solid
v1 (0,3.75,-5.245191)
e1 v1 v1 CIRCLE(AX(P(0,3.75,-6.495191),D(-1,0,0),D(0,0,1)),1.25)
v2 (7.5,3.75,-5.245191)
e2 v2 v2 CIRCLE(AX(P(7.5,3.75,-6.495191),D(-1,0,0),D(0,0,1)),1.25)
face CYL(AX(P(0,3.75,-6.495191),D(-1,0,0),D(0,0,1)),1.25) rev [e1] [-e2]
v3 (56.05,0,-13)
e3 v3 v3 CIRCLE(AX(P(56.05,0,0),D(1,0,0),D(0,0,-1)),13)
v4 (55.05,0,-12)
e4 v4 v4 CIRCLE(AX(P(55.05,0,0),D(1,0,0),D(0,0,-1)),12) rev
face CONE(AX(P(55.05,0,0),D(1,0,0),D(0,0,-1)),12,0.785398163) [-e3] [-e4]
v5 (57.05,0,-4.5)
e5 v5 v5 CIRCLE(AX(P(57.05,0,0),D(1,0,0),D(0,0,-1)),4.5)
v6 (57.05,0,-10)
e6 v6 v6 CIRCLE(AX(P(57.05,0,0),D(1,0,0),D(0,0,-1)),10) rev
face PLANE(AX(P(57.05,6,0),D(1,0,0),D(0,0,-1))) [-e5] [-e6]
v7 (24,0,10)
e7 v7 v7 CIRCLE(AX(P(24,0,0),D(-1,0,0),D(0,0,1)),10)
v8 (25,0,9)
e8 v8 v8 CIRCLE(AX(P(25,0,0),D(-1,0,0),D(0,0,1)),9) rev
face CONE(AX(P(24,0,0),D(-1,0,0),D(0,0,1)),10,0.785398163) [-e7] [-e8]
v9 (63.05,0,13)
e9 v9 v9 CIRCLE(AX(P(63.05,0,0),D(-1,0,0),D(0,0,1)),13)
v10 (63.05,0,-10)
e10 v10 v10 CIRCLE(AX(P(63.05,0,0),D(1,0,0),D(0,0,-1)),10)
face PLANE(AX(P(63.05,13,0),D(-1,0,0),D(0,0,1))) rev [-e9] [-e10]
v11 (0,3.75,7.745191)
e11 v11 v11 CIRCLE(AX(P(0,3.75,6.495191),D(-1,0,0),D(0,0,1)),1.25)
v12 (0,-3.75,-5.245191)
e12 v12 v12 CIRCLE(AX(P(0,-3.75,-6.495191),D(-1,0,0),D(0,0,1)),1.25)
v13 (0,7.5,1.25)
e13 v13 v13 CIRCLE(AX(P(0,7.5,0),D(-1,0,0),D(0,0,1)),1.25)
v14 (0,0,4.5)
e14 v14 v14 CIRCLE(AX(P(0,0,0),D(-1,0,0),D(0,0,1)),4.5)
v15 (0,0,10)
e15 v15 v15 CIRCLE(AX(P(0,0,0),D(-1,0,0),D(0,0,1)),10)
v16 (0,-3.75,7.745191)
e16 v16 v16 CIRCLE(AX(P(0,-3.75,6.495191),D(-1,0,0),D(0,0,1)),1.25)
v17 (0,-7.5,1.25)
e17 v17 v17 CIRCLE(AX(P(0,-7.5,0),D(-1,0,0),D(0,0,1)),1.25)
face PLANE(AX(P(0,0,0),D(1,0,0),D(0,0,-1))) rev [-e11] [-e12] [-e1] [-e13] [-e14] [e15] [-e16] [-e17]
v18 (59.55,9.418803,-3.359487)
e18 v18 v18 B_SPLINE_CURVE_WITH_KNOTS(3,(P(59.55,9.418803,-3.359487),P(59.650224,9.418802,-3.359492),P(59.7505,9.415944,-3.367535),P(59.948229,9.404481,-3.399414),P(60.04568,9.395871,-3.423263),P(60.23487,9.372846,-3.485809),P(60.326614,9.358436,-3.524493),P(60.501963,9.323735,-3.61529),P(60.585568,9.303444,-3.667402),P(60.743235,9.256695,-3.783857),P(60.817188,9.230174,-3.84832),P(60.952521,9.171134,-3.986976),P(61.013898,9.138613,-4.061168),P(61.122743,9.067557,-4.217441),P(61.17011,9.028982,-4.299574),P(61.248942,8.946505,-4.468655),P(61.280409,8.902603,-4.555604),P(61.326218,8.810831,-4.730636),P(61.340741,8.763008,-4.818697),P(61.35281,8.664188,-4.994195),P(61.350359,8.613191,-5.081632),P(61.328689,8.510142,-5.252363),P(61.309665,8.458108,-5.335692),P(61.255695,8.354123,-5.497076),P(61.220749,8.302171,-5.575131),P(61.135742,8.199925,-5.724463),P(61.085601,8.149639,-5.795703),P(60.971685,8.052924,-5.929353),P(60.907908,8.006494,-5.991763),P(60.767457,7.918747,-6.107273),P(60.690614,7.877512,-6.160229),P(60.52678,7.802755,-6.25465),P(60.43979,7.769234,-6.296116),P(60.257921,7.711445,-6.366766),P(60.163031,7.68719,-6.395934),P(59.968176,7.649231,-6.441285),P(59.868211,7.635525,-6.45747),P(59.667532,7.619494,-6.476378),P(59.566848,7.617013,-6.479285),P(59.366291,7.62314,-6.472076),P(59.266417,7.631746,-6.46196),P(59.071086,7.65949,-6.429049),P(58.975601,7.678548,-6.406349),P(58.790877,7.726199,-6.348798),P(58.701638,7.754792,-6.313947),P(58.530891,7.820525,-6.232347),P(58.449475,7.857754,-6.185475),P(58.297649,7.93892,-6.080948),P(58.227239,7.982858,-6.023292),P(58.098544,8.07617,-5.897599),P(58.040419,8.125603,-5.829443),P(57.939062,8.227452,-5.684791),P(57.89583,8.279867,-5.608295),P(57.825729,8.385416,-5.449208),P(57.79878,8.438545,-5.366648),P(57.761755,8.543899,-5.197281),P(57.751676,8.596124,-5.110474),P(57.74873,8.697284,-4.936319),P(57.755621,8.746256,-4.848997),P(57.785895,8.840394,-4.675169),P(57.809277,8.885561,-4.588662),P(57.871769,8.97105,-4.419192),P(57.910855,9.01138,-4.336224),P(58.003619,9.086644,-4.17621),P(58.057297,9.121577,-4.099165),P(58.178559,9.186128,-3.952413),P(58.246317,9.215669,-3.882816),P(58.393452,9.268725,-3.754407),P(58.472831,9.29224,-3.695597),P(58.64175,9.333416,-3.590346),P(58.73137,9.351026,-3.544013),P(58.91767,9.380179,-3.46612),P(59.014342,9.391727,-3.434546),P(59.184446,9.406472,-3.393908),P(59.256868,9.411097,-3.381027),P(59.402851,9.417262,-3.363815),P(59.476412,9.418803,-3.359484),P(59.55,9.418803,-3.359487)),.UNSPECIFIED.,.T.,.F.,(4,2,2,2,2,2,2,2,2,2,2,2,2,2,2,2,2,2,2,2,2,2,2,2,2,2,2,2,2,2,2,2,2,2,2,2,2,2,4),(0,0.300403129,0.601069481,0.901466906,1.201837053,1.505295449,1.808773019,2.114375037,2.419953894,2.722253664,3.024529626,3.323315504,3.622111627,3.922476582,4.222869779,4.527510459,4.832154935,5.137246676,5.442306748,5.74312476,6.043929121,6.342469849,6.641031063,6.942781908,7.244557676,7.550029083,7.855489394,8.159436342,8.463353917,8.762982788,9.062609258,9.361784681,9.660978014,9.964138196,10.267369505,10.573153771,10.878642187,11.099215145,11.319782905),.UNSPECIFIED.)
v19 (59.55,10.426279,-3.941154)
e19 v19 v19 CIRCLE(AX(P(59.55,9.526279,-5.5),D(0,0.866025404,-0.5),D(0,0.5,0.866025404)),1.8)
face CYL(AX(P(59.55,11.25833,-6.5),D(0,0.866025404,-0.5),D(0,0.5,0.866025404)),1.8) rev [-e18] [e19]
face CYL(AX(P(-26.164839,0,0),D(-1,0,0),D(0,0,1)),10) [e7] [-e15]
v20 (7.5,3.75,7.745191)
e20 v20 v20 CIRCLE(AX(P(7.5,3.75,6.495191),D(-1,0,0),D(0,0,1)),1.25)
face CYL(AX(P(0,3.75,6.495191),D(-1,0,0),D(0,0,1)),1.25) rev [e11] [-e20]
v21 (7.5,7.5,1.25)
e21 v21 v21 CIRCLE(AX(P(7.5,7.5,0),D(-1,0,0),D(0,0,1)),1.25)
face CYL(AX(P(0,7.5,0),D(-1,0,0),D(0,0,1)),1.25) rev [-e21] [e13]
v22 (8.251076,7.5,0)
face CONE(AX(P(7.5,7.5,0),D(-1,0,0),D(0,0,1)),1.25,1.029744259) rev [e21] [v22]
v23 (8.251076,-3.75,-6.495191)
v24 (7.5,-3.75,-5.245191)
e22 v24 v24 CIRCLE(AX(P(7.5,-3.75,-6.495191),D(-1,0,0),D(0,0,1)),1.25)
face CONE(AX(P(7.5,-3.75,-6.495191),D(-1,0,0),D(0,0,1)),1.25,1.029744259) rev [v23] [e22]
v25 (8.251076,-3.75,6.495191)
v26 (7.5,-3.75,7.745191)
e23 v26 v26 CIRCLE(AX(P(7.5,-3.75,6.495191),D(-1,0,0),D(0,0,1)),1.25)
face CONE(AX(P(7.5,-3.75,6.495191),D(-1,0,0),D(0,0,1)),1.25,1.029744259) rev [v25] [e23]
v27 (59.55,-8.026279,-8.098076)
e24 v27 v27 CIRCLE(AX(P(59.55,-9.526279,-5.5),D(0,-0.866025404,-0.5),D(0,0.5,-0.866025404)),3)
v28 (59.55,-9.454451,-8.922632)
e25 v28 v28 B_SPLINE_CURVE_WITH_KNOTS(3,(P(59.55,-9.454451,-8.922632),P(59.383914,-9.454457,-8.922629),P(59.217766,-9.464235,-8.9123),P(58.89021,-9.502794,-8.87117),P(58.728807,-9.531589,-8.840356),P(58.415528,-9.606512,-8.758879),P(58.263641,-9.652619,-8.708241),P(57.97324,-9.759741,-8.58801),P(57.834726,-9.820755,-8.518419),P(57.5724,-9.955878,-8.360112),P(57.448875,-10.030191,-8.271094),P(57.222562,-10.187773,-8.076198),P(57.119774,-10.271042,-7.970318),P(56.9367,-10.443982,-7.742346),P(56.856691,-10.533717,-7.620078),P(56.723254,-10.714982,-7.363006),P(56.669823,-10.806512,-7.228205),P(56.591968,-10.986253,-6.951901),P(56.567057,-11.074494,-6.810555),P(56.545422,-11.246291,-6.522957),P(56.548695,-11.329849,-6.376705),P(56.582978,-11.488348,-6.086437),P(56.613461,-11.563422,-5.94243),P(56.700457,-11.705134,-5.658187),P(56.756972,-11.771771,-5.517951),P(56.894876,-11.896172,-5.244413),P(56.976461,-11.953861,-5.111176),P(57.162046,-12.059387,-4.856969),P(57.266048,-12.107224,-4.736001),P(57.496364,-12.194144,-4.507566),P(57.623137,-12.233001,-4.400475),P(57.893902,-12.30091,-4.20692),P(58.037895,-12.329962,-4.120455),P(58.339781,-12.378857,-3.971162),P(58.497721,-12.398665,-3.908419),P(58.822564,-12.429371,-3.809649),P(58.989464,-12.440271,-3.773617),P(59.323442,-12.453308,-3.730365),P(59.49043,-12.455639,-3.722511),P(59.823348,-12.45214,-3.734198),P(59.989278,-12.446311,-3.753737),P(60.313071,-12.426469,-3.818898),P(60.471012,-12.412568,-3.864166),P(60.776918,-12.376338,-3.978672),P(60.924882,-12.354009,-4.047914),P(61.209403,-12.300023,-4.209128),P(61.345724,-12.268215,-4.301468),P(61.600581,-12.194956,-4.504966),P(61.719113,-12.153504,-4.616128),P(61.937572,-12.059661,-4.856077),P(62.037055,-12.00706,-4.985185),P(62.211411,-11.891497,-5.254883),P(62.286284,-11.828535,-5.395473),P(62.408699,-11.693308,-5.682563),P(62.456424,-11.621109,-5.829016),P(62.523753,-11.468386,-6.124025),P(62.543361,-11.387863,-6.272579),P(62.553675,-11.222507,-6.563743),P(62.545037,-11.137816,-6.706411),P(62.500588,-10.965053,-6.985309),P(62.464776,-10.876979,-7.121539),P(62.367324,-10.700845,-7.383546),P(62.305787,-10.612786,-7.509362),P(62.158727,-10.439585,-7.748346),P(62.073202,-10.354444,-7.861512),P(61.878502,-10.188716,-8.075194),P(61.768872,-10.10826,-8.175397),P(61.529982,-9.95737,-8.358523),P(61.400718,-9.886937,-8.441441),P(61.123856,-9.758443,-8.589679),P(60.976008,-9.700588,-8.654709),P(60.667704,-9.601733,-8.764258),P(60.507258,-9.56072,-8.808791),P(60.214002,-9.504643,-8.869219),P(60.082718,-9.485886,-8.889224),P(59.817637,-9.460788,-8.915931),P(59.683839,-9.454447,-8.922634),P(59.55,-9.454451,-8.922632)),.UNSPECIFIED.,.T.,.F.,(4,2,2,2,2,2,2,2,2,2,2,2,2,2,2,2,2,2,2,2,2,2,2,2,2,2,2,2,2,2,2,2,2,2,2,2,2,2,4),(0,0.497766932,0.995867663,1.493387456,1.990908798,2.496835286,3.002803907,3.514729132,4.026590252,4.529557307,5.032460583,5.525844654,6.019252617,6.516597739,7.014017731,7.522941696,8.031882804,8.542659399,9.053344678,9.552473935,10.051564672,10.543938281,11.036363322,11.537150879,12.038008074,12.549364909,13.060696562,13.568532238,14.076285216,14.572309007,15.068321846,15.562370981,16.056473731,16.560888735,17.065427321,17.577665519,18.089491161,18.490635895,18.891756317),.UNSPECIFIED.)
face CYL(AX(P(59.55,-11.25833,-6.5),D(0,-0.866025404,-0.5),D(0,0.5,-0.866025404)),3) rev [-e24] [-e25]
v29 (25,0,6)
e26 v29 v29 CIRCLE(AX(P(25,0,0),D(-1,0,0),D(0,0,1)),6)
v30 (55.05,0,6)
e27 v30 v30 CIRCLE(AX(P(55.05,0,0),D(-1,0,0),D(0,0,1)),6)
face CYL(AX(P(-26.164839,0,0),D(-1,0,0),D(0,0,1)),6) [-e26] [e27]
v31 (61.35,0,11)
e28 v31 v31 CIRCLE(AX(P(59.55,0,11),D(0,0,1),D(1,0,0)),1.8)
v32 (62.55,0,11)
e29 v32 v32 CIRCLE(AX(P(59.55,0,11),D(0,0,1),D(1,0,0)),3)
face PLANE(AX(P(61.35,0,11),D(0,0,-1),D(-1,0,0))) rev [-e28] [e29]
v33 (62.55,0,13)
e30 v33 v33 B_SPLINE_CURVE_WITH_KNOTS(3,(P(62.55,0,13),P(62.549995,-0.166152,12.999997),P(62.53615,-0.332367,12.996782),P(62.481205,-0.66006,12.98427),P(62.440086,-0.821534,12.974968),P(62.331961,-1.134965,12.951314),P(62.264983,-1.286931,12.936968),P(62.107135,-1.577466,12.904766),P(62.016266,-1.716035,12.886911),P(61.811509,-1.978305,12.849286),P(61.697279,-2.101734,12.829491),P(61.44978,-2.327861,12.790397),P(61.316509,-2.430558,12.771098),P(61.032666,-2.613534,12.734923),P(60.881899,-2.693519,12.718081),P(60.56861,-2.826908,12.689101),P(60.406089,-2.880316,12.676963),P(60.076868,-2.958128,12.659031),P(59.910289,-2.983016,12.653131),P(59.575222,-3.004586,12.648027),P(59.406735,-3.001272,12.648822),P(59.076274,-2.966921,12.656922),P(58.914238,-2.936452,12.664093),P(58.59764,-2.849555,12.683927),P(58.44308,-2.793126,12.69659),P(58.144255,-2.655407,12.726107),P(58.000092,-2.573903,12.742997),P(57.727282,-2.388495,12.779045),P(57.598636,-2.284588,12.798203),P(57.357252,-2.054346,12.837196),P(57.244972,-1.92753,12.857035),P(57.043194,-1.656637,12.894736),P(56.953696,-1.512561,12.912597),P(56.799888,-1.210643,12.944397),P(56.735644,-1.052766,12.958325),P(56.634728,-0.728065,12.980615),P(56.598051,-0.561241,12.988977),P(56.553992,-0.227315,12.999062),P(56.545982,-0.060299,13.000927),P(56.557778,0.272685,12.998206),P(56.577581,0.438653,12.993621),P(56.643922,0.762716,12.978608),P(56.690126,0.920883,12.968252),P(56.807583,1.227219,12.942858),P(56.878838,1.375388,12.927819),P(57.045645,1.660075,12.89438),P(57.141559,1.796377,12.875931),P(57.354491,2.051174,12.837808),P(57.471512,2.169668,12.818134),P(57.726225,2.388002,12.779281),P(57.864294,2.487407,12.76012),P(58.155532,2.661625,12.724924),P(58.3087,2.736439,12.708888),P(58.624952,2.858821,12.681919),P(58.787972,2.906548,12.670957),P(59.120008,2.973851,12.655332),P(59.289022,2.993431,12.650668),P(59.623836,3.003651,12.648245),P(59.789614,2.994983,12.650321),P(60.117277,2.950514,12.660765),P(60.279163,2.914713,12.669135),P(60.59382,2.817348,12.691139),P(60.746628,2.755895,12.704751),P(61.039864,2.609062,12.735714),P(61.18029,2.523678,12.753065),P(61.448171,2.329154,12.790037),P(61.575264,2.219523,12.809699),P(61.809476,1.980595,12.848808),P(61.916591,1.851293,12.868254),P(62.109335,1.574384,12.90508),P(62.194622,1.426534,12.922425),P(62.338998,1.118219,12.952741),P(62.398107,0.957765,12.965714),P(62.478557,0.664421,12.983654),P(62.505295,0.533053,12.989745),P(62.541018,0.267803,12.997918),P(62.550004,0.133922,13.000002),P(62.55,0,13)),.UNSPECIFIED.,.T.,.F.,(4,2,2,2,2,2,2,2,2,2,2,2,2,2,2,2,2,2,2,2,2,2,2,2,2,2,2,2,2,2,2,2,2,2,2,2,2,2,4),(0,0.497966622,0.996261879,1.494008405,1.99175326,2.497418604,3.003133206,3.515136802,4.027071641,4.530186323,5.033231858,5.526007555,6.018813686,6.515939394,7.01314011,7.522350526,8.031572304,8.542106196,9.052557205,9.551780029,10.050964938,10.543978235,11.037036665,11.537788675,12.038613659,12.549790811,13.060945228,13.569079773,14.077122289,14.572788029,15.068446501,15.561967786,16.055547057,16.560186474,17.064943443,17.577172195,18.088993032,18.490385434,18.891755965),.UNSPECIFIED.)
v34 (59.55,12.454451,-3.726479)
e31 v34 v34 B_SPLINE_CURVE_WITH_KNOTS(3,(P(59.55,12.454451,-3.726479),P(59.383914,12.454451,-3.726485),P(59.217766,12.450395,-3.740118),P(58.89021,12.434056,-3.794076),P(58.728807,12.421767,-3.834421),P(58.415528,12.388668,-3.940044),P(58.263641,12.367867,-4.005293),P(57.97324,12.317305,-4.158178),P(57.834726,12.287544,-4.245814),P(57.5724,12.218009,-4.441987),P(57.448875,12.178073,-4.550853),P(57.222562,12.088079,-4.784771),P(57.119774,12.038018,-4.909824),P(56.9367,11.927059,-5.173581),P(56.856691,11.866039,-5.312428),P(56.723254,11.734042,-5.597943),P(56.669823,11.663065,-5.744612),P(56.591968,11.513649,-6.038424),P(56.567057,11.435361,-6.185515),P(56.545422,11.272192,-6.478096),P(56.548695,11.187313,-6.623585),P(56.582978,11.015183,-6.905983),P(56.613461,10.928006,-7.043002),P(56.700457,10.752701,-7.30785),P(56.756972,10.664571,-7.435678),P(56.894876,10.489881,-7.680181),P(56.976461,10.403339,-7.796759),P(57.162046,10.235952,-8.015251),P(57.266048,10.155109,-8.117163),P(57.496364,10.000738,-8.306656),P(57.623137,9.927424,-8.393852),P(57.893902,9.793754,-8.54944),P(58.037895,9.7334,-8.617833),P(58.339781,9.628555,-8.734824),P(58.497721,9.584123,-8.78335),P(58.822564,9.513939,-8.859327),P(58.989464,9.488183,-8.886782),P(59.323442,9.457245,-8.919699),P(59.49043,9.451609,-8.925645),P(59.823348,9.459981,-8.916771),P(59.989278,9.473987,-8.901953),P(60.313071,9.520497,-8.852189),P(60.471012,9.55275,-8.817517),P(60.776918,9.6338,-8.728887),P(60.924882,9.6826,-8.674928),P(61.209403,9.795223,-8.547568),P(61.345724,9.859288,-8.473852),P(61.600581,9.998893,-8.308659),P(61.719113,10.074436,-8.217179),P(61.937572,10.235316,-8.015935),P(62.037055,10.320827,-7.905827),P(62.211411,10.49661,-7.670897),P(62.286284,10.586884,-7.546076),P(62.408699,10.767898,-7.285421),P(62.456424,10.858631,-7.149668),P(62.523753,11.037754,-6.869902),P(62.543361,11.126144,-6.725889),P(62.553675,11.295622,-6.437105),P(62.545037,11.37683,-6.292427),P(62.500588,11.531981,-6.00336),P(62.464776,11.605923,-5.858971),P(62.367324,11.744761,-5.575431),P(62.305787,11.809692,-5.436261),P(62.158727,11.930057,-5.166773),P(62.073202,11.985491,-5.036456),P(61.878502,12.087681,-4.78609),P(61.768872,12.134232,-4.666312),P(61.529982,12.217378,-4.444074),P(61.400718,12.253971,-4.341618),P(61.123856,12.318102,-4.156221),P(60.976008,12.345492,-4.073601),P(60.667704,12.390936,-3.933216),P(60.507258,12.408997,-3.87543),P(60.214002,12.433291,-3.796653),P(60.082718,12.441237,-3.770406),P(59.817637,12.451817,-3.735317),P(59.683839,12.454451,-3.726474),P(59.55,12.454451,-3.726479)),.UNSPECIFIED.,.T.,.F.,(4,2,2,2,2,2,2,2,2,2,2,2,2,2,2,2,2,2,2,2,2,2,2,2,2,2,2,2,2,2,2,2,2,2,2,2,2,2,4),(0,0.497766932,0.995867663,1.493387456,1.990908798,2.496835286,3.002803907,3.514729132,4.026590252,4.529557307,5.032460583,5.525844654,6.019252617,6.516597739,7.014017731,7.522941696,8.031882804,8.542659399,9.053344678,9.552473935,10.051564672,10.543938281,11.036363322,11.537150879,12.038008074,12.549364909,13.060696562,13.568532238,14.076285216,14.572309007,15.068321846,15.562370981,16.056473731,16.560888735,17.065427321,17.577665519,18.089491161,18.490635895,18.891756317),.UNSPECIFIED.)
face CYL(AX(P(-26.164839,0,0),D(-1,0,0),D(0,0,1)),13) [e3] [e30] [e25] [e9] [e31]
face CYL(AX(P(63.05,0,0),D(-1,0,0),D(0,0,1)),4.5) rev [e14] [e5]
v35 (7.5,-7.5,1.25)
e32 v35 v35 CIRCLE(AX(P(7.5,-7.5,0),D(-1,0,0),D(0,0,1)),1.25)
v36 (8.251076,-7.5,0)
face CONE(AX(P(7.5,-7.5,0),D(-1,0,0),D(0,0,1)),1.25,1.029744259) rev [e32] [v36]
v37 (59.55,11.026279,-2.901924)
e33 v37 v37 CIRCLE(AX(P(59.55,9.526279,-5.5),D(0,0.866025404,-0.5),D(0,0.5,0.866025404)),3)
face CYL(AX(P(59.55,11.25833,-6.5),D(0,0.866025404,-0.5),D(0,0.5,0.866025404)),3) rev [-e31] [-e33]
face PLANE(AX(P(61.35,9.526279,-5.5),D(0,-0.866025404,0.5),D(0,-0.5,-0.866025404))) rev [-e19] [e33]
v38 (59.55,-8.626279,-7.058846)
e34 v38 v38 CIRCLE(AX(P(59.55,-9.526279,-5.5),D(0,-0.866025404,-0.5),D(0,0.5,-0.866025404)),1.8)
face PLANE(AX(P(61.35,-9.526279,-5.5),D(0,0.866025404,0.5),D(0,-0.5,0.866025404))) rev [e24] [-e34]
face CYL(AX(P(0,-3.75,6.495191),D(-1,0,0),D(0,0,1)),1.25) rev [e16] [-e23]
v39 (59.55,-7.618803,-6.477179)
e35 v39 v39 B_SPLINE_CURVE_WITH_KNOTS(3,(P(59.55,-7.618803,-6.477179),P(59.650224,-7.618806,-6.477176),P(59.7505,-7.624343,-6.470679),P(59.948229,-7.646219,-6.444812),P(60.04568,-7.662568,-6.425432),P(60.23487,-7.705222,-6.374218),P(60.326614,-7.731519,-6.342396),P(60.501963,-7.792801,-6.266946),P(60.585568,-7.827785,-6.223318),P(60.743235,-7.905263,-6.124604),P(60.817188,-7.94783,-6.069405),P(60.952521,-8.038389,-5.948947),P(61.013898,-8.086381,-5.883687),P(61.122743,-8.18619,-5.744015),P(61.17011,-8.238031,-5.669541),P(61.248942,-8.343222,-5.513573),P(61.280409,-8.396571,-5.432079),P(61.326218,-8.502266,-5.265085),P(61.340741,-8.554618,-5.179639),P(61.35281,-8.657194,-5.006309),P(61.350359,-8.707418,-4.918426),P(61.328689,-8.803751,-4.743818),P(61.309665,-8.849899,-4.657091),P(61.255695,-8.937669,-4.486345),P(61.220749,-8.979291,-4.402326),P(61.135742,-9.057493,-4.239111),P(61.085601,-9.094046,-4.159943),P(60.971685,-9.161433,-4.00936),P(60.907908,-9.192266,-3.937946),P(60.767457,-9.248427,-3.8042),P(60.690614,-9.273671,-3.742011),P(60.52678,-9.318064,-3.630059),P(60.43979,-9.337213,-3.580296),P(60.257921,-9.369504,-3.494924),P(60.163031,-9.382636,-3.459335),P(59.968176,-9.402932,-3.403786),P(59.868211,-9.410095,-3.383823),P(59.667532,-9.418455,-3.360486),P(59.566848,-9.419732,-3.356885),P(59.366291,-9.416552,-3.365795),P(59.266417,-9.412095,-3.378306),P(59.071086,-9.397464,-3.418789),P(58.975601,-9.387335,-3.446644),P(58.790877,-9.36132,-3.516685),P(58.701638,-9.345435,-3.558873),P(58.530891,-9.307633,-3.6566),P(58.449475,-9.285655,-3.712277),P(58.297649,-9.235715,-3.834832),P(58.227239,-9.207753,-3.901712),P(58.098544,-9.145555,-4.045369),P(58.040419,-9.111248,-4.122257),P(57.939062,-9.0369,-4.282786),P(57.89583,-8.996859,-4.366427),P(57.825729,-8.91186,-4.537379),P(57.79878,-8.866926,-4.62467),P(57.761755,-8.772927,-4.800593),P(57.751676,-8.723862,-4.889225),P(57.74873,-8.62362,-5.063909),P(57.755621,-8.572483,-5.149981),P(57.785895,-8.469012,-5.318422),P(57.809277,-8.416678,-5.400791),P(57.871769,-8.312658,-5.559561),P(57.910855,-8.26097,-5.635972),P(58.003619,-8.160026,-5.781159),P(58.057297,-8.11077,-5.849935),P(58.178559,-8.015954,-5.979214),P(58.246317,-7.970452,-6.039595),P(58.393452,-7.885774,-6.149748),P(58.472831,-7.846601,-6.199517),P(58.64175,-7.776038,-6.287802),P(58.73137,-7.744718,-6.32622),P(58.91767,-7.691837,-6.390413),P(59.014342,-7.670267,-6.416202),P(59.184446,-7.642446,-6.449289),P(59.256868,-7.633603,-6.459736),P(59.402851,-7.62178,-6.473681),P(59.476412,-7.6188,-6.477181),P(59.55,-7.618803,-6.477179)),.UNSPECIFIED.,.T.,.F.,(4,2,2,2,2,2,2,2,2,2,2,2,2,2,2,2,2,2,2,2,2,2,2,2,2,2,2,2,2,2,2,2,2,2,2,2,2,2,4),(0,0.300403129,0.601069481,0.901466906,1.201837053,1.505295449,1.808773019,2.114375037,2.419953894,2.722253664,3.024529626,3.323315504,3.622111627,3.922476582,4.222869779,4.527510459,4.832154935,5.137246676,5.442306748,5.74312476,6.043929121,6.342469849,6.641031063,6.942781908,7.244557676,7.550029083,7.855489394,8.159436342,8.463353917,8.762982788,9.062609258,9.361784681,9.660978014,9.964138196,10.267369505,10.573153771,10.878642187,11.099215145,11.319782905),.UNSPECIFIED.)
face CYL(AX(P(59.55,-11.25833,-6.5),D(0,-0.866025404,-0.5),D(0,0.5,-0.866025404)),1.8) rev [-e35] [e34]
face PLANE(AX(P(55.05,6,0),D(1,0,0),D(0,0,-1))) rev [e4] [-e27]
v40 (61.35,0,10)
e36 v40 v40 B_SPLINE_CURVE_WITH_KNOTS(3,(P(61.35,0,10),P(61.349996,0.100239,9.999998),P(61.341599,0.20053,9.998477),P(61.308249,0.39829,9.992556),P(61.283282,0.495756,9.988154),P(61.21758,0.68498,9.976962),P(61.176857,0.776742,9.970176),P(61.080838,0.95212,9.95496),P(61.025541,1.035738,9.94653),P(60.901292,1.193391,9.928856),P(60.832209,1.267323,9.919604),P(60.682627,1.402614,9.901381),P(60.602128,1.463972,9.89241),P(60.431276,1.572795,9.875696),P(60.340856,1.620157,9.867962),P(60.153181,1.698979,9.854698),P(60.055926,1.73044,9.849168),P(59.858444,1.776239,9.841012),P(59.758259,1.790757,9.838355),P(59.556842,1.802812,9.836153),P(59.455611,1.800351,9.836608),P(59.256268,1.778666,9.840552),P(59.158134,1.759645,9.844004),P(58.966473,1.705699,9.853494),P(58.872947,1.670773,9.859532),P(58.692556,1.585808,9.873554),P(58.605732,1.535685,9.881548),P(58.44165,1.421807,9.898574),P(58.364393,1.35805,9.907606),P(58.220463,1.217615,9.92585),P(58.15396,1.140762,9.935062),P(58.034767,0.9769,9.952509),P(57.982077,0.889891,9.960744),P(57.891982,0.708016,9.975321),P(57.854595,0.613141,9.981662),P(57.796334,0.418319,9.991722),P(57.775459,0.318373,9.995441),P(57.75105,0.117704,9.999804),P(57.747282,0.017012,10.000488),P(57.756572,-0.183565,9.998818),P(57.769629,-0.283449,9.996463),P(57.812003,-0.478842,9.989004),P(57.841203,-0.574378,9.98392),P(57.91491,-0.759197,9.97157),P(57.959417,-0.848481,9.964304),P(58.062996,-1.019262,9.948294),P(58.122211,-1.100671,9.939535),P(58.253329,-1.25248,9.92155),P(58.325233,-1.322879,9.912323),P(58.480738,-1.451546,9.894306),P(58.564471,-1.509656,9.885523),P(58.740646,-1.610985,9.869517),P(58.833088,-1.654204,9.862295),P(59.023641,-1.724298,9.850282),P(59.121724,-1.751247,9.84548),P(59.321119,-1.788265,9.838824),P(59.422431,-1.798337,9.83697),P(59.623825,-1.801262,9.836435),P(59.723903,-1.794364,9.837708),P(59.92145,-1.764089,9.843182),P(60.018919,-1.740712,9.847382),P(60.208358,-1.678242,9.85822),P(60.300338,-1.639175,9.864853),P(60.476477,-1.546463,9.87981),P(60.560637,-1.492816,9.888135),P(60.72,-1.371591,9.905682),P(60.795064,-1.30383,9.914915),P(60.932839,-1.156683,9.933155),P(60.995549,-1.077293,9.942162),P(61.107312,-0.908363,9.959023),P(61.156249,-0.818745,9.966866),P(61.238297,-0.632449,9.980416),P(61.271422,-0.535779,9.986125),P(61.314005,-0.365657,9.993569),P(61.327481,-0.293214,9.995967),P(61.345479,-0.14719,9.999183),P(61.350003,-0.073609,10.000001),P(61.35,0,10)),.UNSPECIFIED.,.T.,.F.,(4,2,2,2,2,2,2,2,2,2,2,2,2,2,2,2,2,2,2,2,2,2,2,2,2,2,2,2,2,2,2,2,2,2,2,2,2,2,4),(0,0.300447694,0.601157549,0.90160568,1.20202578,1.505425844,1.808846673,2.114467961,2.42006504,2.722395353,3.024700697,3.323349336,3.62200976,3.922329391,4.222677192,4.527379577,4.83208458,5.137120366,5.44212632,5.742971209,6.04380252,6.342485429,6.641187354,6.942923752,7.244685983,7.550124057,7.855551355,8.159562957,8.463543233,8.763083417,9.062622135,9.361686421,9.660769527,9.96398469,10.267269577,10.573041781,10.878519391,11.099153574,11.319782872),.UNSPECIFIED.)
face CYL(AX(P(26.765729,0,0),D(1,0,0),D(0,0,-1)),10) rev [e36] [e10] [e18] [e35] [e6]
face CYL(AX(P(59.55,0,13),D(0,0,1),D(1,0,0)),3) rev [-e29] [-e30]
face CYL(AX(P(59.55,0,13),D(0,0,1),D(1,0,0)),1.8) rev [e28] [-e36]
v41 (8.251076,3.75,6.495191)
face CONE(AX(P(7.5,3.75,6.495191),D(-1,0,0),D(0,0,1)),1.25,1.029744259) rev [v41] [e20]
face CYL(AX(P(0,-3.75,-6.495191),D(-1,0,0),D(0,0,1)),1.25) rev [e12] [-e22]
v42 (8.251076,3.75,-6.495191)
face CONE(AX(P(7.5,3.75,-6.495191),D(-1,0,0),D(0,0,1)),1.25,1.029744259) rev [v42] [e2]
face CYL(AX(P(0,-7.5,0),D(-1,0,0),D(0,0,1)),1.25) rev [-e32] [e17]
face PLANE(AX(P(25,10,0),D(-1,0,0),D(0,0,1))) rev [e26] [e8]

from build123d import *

# Parameters (mm, degrees)
SKETCH_2_R                = 10
CUT_EXTRUDE_1_DEPTH       = 6
SKETCH_3_R                = 4.5
CUT_EXTRUDE_2_DEPTH       = 66.675737529
HOLE_START                = 11
HOLE_WIZARD_1_OUTLINE_R   = 3
HOLE_WIZARD_1_DEPTH       = 2.000000102
HOLE_START_2              = 9.836666254
HOLE_WIZARD_1_2_OUTLINE_R = 1.8
HOLE_WIZARD_1_2_DEPTH     = 1.163333746
PATTERN_CIRCULAR_1_COUNT  = 3
PATTERN_CIRCULAR_2_COUNT  = 6
CHAMFER_1_SIZE            = 1


# Read off the part's stored shape, not the designer's step: 打孔尺寸(%根据)内六角圆柱头螺钉的类型1
with BuildPart() as part:
    # 草图1 → 旋转1 (revolve)
    with BuildSketch(Plane.XY, mode=Mode.PRIVATE) as revolve_1_sk:
        Polygon((0, 0), (0, 10), (25, 10), (25, 6), (55.05, 6), (55.05, 13), (63.05, 13), (63.05, 0), align=None)
    revolve(revolve_1_sk.sketch.rotate(Axis((-26.16483903, 0, 0), (1, 0, 0)), 90), axis=Axis((-26.16483903, 0, 0), (1, 0, 0)))

    # 草图2 → 切除-拉伸1 (cut)
    with BuildSketch(Plane(origin=(63.05, 0, 0), x_dir=(0, 0, -1), z_dir=(1, 0, 0))):
        with Locations(Location((0, 0, 0), (0, 0, 180))):
            Circle(SKETCH_2_R)
    extrude(amount=-CUT_EXTRUDE_1_DEPTH, mode=Mode.SUBTRACT)

    # 草图3 → 切除-拉伸2 (cut, through all)
    with BuildSketch(Plane.ZY):
        Circle(SKETCH_3_R)
    extrude(amount=-CUT_EXTRUDE_2_DEPTH, mode=Mode.SUBTRACT)

    # 打孔尺寸(%根据)内六角圆柱头螺钉的类型1 outline → 打孔尺寸(%根据)内六角圆柱头螺钉的类型1 (cut)
    with BuildSketch(Plane.XY.offset(HOLE_START)):
        with Locations((59.55, 0)):
            Circle(HOLE_WIZARD_1_OUTLINE_R)
    hole_wizard_1 = extrude(amount=HOLE_WIZARD_1_DEPTH, mode=Mode.SUBTRACT)

    # Hole Wizard 1 2 outline → Hole Wizard 1 2 (cut)
    with BuildSketch(Plane.XY.offset(HOLE_START_2)):
        with Locations((59.55, 0)):
            Circle(HOLE_WIZARD_1_2_OUTLINE_R)
    hole_wizard_1_2 = extrude(amount=HOLE_WIZARD_1_2_DEPTH, mode=Mode.SUBTRACT)

    # 阵列(圆周)1: 打孔尺寸(%根据)内六角圆柱头螺钉的类型1, Hole Wizard 1 2 ×3 about axis
    pattern_circular_1_axis = Axis((0, 0, 0), (1, 0, 0))
    add([hole_wizard_1.rotate(pattern_circular_1_axis, i * 360 / PATTERN_CIRCULAR_1_COUNT) for i in range(1, PATTERN_CIRCULAR_1_COUNT)], mode=Mode.SUBTRACT)
    add([hole_wizard_1_2.rotate(pattern_circular_1_axis, i * 360 / PATTERN_CIRCULAR_1_COUNT) for i in range(1, PATTERN_CIRCULAR_1_COUNT)], mode=Mode.SUBTRACT)

    # 草图10 → M3 螺纹孔1 (revolve, cut)
    with BuildSketch(Plane.ZX.offset(7.5)):
        Polygon((0, 0), (0, 8.251075774), (1.25, 7.5), (1.25, 0), align=None)
    hole_wizard_m3_1 = revolve(axis=Axis((-6.35, 7.5, 0), (1, 0, 0)), mode=Mode.SUBTRACT)

    # 阵列(圆周)2: M3 螺纹孔1 ×6 about axis
    pattern_circular_2_axis = Axis((0, 0, 0), (1, 0, 0))
    for i in range(1, PATTERN_CIRCULAR_2_COUNT):
        add(hole_wizard_m3_1.rotate(pattern_circular_2_axis, i * 360 / PATTERN_CIRCULAR_2_COUNT), mode=Mode.SUBTRACT)

    # 倒角1
    chamfer_1_edges = [part.edges().sort_by_distance(p)[0] for p in [
        (55.05, 0, -13),
        (25, 0, -10),
    ]]
    chamfer(chamfer_1_edges, length=CHAMFER_1_SIZE)


solid = part.part
